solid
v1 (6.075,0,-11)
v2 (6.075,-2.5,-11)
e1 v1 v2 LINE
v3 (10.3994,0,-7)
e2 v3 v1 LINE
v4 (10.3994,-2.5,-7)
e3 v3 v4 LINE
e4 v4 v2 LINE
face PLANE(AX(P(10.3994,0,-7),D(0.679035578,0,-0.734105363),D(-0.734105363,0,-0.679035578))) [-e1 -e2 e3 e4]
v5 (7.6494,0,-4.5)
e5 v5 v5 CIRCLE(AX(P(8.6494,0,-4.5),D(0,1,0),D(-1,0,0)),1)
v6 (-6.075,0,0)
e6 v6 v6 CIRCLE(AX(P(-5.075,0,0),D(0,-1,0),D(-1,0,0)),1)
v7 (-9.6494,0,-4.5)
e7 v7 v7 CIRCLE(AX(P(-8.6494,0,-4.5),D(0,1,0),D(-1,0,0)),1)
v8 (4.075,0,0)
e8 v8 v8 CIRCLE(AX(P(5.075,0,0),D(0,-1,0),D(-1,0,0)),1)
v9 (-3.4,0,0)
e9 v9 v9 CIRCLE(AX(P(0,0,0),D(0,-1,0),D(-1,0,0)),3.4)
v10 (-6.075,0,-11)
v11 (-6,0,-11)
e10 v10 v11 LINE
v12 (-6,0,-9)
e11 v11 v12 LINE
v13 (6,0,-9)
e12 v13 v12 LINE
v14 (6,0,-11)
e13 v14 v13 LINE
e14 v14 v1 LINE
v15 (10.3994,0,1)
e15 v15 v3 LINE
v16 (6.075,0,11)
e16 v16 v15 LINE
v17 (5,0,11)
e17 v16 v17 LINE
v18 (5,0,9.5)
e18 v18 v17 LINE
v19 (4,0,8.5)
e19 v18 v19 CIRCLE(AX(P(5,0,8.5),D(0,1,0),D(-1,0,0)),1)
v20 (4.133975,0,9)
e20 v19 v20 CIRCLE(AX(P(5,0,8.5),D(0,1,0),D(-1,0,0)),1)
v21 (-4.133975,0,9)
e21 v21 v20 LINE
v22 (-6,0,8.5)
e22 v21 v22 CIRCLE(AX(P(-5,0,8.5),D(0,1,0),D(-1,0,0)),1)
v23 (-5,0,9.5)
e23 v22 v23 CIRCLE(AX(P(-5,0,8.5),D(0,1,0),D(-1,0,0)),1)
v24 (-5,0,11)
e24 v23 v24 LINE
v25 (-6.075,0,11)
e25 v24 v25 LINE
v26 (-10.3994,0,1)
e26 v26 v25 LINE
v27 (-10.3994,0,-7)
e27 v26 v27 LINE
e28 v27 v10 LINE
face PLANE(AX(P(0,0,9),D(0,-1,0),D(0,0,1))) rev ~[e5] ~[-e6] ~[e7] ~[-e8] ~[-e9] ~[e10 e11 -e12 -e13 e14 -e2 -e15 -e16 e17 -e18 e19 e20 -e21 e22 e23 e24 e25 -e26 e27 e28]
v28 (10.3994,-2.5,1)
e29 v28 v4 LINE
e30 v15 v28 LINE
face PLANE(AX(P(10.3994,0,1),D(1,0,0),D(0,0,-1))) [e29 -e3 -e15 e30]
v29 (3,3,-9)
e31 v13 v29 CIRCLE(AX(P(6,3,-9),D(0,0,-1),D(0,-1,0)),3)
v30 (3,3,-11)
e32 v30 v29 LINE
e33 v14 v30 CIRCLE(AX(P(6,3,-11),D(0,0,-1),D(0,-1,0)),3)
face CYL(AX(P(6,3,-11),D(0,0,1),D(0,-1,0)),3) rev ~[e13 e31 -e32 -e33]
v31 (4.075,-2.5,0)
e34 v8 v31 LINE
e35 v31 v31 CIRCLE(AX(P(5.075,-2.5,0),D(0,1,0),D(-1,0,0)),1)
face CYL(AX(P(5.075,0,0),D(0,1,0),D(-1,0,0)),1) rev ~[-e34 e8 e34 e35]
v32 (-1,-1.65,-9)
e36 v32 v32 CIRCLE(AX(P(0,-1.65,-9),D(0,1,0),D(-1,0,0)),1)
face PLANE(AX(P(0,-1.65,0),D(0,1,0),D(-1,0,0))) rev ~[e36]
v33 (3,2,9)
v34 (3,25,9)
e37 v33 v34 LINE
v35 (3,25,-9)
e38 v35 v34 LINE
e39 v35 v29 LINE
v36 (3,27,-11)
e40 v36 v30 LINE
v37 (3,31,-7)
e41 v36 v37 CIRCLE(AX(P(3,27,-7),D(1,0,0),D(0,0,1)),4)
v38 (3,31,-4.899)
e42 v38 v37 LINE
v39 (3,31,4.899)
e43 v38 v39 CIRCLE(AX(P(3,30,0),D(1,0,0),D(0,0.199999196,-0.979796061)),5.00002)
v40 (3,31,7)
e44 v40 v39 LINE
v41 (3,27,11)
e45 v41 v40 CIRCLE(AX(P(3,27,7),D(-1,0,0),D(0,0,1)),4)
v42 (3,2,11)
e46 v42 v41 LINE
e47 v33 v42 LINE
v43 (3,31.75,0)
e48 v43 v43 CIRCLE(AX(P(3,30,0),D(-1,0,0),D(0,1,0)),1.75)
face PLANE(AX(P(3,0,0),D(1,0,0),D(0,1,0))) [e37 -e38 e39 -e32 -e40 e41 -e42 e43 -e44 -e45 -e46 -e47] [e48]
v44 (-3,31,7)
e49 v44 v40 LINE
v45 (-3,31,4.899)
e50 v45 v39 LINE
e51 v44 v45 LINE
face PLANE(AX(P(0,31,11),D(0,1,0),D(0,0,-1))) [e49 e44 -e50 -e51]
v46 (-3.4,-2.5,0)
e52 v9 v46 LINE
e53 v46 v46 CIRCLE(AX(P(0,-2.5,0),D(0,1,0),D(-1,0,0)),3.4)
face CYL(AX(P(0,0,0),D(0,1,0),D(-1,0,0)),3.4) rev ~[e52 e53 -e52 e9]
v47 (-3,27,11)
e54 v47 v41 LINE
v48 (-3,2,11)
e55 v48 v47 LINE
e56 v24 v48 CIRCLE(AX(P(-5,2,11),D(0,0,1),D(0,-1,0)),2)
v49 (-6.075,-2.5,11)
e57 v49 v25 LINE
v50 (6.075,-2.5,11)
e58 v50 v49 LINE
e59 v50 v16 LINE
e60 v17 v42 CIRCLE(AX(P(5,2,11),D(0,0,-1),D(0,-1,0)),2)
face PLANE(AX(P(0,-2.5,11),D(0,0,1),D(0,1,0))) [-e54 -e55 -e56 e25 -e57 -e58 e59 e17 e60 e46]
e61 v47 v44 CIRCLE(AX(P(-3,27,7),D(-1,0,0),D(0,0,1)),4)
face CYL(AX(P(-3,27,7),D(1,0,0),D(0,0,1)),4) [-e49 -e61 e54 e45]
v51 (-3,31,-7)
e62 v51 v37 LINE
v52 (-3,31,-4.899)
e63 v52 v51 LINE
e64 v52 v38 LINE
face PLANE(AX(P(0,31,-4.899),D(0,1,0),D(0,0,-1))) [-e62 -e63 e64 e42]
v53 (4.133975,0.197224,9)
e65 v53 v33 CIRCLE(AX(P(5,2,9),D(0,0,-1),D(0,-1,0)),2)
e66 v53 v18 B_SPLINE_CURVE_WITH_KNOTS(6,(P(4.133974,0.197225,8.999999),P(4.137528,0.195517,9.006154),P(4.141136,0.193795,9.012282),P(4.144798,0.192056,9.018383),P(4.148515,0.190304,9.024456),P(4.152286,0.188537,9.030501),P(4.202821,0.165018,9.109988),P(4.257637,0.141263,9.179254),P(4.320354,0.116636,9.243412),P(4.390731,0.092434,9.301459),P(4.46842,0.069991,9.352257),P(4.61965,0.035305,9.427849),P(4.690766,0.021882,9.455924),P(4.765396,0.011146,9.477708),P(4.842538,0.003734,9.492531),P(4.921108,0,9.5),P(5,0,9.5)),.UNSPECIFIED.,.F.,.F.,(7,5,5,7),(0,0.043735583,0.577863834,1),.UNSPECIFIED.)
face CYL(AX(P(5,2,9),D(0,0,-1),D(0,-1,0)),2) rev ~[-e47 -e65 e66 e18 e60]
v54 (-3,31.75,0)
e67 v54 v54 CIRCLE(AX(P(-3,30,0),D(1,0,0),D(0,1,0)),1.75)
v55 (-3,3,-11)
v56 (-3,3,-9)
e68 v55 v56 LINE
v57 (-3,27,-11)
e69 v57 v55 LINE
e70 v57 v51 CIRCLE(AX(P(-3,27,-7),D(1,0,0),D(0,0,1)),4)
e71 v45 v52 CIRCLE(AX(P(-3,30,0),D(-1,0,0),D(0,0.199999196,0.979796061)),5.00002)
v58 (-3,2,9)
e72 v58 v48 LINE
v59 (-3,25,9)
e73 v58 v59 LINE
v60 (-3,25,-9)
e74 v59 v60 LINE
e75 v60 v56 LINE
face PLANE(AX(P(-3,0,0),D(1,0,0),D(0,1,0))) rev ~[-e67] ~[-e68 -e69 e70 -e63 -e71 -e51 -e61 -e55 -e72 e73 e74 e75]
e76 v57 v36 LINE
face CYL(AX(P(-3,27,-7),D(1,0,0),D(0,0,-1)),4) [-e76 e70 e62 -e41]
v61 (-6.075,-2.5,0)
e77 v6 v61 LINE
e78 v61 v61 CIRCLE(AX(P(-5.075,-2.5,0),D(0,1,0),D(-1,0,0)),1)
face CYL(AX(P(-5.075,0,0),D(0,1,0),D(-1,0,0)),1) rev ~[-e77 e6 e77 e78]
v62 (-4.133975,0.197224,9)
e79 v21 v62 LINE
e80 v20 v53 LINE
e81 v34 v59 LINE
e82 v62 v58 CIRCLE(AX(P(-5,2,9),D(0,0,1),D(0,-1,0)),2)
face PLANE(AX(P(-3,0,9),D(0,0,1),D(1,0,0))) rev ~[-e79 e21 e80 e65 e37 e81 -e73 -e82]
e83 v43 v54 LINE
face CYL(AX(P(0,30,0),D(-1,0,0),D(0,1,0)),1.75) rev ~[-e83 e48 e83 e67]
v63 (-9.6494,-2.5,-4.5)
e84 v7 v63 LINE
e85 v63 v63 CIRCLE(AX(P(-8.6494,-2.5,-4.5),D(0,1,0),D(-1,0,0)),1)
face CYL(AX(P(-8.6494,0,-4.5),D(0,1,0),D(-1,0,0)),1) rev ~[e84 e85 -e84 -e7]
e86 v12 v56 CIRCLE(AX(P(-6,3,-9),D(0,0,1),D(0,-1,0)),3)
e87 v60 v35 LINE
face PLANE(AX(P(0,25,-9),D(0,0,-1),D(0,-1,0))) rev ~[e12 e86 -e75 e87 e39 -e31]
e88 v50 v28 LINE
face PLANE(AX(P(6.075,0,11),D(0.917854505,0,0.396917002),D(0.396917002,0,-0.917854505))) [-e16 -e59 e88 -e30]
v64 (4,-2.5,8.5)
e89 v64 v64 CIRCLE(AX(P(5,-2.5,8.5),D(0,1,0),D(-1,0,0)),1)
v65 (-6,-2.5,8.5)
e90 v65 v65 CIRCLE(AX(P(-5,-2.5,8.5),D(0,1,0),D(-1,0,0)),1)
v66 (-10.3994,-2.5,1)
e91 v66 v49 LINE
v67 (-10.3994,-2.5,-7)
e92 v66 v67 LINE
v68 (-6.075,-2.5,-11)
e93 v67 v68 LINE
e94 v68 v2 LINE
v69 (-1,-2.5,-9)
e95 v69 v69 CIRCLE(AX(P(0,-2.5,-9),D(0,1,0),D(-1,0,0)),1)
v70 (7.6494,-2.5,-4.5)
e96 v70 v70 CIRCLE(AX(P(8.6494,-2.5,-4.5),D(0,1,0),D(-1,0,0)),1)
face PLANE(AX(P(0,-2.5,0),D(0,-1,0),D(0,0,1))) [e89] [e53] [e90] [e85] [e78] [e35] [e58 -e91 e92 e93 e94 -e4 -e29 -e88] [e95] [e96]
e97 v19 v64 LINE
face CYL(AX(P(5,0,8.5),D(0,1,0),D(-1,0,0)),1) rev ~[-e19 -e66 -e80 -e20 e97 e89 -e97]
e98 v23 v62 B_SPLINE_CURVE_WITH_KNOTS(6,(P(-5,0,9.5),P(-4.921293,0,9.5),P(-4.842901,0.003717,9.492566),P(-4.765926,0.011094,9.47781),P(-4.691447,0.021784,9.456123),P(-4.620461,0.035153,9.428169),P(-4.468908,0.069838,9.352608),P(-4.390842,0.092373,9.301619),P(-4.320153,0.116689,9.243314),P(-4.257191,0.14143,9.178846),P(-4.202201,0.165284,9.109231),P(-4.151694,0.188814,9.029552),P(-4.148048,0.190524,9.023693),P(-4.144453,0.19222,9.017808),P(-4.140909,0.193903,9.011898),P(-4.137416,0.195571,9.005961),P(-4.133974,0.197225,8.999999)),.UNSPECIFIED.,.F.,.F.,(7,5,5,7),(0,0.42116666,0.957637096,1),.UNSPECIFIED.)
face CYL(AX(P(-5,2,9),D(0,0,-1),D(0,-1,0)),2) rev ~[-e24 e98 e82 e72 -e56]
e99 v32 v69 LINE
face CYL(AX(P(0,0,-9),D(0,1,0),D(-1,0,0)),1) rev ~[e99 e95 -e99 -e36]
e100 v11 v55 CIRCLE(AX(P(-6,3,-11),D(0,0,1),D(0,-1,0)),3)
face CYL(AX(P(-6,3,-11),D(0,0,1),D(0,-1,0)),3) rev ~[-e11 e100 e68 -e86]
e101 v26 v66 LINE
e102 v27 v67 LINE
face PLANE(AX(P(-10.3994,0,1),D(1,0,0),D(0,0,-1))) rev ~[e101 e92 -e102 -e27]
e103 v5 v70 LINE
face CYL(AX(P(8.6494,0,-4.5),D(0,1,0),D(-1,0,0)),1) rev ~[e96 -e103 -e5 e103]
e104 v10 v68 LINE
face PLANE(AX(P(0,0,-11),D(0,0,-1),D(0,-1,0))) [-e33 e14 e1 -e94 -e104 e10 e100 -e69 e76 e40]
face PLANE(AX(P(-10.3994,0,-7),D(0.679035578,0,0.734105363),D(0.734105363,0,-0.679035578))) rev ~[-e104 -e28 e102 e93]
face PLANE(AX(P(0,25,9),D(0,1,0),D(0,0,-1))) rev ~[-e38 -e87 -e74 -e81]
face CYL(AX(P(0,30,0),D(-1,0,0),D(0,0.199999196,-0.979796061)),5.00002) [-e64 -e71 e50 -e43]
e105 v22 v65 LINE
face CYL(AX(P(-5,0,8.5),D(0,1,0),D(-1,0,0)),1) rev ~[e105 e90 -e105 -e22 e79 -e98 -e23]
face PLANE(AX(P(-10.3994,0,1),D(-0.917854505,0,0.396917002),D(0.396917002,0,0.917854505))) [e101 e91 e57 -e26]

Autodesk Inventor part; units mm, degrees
ref_plane "YZ Plane" through (0, 0, 0) normal (1, 0, 0) x (0, 1, 0)
ref_plane "XZ Plane" through (0, 0, 0) normal (0, 1, 0) x (-1, 0, 0)
ref_plane "XY Plane" through (0, 0, 0) normal (0, 0, 1) x (1, 0, 0)
sketch "sk_main" plane through (0, 0, 0) normal (1, 0, 0) x (0, 1, 0)
  line L0 (-10, 0) -> (42.5, 0) projected
  line L1 (0, -15.4) -> (0, 15.4) projected
  line L2 (25, -9) -> (0, -9)
  line L3 (0, -9) -> (0, 9)
  line L4 (0, 9) -> (25, 9)
  line L5 (25, 9) -> (25, -9)
  line L6 (25, -9) -> (0, 9) construction
  line L7 (0, -9) -> (25, 9) construction
  circle A0 centre (30, 0) radius 1.75
  circle A1 centre (30, 0) radius 5 construction
  line L8 (-2.5, 11) -> (31, 11)
  line L9 (31, 11) -> (31, 4.899)
  line L10 (31, -4.899) -> (31, -11)
  line L11 (31, -11) -> (-2.5, -11)
  line L12 (-2.5, -11) -> (-2.5, 11)
  arc A2 (31, -4.899) -> (31, 4.899) centre (30, 0) ccw
  line L13 (0, 11) -> (0, -11)
  point P0 (0, 0)
  point P1 (12.5, 0)
  dimension "d0" = 25
  dimension "d1" = 18
  dimension "d2" = 3.5
  dimension "d3" = 5
  dimension "d4" = 2
  dimension "d5" = 2.5
  dimension "d6" = 1
extrude "ext_main_back" add sketch "sk_main" along normal mid plane 6 contours L5 L4 L1 L8 L9 A2 L0 A0 | L0 A0 A2 L10 L11 L1 L2 L5
extrude "ext_main_front" add sketch "sk_main" along normal mid plane 12.15 contours L12 L8 L1 L0 | L0 L1 L11 L12
sketch "sk_front" plane through (0, 0, 0) normal (0, 1, 0) x (-1, 0, 0)
  line L0 (0, -15.4) -> (0, 15.4) projected
  line L1 (8.505, 0) -> (-8.505, 0) projected
  circle A0 centre (0, 0) radius 3.4
  circle A1 centre (5.075, 0) radius 1
  circle A2 centre (-5.075, 0) radius 1
  circle A3 centre (0, 0) radius 8 construction
  circle A4 centre (0, -9) radius 8 construction
  circle A5 centre (0, -9) radius 1
  circle A6 centre (8.6494, -4.5) radius 1.75 construction
  circle A7 centre (-8.6494, -4.5) radius 1.75 construction
  line L2 (8.6494, -4.5) -> (-8.6494, -4.5) construction
  line L3 (-6.075, 11) -> (-6.075, -11) projected
  line L4 (6.075, -11) -> (6.075, 11) projected
  line L5 (10.3994, 1) -> (10.3994, -7)
  line L6 (10.3994, 1) -> (6.075, 11)
  line L7 (10.3994, -7) -> (6.075, -11)
  line L8 (-6.075, 11) -> (-10.3994, 1)
  line L9 (-10.3994, 1) -> (-10.3994, -7)
  line L10 (-10.3994, -7) -> (-6.075, -11)
  line L11 (6.075, -11) -> (-6.075, -11) projected
  circle A8 centre (-8.6494, -4.5) radius 1
  circle A9 centre (8.6494, -4.5) radius 1
  circle A10 centre (-5, 8.5) radius 1
  circle A11 centre (-5, 8.5) radius 2.25 construction
  line L12 (-5, 8.5) -> (5, 8.5) construction
  circle A12 centre (5, 8.5) radius 2.25 construction
  circle A13 centre (5, 8.5) radius 1
  point P0 (0, 8.5)
  dimension "d11" = 6.8
  dimension "d12" = 2
  dimension "d13" = 10.15
  dimension "d14" = 16
  dimension "d15" = 16
  dimension "d16" = 9
  dimension "d17" = 2
  dimension "d18" = 3.5
  dimension "d21" = 8
  dimension "d22" = 4
  dimension "d26" = 2
  dimension "d27" = 2
  dimension "d28" = 4.5
  dimension "d30" = 10
  dimension "d31" = 8.5
extrude "ext_front_tabs" add sketch "sk_front" against normal up to surface (2.5 mm away) contours L4 L6 L5 L7 | L10 L9 L8 L3 | A8 | A9
extrude "ext_cut_holesfront" cut sketch "sk_front" against normal through all contours A5 L0 | L0 A5 | A1 L1 | L1 A1 | A2 L1 | L1 A2 | A0 L1 L0 | L0 L1 A0 | L1 A0 L0 | L0 A0 L1 | A8 | A9 | A10 | A13
fillet "Fillet2" radius 2 2 edges at (3, 0, 10) (-3, 0, 10)
fillet "Fillet3" radius 3 2 edges at (3, 0, -10) (-3, 0, -10)
fillet "Fillet4" radius 4 2 edges at (0, 31, 11) (0, 31, -11)
extrude "ext_dowelfill" add sketch "sk_front" against normal blind 1.65 contours A5 L0 | L0 A5
equation "\"d2\" = screw_m3_bore_loose"
equation "\"d12\" = screw_m2_bore_selfthreading"
equation "\"d17\" = screw_m2_bore_selfthreading"
equation "\"d26\" = screw_m2_bore_selfthreading"
equation "\"d27\" = screw_m2_bore_selfthreading"
equation "\"d28\" = screw_m2_head_maxsize"
equation "\"screw_m3_bore_loose\" = 3.5"
equation "\"screw_m2_bore_selfthreading\" = 2"
equation "\"screw_m2_head_maxsize\" = 4.5"
properties part number "empty"
